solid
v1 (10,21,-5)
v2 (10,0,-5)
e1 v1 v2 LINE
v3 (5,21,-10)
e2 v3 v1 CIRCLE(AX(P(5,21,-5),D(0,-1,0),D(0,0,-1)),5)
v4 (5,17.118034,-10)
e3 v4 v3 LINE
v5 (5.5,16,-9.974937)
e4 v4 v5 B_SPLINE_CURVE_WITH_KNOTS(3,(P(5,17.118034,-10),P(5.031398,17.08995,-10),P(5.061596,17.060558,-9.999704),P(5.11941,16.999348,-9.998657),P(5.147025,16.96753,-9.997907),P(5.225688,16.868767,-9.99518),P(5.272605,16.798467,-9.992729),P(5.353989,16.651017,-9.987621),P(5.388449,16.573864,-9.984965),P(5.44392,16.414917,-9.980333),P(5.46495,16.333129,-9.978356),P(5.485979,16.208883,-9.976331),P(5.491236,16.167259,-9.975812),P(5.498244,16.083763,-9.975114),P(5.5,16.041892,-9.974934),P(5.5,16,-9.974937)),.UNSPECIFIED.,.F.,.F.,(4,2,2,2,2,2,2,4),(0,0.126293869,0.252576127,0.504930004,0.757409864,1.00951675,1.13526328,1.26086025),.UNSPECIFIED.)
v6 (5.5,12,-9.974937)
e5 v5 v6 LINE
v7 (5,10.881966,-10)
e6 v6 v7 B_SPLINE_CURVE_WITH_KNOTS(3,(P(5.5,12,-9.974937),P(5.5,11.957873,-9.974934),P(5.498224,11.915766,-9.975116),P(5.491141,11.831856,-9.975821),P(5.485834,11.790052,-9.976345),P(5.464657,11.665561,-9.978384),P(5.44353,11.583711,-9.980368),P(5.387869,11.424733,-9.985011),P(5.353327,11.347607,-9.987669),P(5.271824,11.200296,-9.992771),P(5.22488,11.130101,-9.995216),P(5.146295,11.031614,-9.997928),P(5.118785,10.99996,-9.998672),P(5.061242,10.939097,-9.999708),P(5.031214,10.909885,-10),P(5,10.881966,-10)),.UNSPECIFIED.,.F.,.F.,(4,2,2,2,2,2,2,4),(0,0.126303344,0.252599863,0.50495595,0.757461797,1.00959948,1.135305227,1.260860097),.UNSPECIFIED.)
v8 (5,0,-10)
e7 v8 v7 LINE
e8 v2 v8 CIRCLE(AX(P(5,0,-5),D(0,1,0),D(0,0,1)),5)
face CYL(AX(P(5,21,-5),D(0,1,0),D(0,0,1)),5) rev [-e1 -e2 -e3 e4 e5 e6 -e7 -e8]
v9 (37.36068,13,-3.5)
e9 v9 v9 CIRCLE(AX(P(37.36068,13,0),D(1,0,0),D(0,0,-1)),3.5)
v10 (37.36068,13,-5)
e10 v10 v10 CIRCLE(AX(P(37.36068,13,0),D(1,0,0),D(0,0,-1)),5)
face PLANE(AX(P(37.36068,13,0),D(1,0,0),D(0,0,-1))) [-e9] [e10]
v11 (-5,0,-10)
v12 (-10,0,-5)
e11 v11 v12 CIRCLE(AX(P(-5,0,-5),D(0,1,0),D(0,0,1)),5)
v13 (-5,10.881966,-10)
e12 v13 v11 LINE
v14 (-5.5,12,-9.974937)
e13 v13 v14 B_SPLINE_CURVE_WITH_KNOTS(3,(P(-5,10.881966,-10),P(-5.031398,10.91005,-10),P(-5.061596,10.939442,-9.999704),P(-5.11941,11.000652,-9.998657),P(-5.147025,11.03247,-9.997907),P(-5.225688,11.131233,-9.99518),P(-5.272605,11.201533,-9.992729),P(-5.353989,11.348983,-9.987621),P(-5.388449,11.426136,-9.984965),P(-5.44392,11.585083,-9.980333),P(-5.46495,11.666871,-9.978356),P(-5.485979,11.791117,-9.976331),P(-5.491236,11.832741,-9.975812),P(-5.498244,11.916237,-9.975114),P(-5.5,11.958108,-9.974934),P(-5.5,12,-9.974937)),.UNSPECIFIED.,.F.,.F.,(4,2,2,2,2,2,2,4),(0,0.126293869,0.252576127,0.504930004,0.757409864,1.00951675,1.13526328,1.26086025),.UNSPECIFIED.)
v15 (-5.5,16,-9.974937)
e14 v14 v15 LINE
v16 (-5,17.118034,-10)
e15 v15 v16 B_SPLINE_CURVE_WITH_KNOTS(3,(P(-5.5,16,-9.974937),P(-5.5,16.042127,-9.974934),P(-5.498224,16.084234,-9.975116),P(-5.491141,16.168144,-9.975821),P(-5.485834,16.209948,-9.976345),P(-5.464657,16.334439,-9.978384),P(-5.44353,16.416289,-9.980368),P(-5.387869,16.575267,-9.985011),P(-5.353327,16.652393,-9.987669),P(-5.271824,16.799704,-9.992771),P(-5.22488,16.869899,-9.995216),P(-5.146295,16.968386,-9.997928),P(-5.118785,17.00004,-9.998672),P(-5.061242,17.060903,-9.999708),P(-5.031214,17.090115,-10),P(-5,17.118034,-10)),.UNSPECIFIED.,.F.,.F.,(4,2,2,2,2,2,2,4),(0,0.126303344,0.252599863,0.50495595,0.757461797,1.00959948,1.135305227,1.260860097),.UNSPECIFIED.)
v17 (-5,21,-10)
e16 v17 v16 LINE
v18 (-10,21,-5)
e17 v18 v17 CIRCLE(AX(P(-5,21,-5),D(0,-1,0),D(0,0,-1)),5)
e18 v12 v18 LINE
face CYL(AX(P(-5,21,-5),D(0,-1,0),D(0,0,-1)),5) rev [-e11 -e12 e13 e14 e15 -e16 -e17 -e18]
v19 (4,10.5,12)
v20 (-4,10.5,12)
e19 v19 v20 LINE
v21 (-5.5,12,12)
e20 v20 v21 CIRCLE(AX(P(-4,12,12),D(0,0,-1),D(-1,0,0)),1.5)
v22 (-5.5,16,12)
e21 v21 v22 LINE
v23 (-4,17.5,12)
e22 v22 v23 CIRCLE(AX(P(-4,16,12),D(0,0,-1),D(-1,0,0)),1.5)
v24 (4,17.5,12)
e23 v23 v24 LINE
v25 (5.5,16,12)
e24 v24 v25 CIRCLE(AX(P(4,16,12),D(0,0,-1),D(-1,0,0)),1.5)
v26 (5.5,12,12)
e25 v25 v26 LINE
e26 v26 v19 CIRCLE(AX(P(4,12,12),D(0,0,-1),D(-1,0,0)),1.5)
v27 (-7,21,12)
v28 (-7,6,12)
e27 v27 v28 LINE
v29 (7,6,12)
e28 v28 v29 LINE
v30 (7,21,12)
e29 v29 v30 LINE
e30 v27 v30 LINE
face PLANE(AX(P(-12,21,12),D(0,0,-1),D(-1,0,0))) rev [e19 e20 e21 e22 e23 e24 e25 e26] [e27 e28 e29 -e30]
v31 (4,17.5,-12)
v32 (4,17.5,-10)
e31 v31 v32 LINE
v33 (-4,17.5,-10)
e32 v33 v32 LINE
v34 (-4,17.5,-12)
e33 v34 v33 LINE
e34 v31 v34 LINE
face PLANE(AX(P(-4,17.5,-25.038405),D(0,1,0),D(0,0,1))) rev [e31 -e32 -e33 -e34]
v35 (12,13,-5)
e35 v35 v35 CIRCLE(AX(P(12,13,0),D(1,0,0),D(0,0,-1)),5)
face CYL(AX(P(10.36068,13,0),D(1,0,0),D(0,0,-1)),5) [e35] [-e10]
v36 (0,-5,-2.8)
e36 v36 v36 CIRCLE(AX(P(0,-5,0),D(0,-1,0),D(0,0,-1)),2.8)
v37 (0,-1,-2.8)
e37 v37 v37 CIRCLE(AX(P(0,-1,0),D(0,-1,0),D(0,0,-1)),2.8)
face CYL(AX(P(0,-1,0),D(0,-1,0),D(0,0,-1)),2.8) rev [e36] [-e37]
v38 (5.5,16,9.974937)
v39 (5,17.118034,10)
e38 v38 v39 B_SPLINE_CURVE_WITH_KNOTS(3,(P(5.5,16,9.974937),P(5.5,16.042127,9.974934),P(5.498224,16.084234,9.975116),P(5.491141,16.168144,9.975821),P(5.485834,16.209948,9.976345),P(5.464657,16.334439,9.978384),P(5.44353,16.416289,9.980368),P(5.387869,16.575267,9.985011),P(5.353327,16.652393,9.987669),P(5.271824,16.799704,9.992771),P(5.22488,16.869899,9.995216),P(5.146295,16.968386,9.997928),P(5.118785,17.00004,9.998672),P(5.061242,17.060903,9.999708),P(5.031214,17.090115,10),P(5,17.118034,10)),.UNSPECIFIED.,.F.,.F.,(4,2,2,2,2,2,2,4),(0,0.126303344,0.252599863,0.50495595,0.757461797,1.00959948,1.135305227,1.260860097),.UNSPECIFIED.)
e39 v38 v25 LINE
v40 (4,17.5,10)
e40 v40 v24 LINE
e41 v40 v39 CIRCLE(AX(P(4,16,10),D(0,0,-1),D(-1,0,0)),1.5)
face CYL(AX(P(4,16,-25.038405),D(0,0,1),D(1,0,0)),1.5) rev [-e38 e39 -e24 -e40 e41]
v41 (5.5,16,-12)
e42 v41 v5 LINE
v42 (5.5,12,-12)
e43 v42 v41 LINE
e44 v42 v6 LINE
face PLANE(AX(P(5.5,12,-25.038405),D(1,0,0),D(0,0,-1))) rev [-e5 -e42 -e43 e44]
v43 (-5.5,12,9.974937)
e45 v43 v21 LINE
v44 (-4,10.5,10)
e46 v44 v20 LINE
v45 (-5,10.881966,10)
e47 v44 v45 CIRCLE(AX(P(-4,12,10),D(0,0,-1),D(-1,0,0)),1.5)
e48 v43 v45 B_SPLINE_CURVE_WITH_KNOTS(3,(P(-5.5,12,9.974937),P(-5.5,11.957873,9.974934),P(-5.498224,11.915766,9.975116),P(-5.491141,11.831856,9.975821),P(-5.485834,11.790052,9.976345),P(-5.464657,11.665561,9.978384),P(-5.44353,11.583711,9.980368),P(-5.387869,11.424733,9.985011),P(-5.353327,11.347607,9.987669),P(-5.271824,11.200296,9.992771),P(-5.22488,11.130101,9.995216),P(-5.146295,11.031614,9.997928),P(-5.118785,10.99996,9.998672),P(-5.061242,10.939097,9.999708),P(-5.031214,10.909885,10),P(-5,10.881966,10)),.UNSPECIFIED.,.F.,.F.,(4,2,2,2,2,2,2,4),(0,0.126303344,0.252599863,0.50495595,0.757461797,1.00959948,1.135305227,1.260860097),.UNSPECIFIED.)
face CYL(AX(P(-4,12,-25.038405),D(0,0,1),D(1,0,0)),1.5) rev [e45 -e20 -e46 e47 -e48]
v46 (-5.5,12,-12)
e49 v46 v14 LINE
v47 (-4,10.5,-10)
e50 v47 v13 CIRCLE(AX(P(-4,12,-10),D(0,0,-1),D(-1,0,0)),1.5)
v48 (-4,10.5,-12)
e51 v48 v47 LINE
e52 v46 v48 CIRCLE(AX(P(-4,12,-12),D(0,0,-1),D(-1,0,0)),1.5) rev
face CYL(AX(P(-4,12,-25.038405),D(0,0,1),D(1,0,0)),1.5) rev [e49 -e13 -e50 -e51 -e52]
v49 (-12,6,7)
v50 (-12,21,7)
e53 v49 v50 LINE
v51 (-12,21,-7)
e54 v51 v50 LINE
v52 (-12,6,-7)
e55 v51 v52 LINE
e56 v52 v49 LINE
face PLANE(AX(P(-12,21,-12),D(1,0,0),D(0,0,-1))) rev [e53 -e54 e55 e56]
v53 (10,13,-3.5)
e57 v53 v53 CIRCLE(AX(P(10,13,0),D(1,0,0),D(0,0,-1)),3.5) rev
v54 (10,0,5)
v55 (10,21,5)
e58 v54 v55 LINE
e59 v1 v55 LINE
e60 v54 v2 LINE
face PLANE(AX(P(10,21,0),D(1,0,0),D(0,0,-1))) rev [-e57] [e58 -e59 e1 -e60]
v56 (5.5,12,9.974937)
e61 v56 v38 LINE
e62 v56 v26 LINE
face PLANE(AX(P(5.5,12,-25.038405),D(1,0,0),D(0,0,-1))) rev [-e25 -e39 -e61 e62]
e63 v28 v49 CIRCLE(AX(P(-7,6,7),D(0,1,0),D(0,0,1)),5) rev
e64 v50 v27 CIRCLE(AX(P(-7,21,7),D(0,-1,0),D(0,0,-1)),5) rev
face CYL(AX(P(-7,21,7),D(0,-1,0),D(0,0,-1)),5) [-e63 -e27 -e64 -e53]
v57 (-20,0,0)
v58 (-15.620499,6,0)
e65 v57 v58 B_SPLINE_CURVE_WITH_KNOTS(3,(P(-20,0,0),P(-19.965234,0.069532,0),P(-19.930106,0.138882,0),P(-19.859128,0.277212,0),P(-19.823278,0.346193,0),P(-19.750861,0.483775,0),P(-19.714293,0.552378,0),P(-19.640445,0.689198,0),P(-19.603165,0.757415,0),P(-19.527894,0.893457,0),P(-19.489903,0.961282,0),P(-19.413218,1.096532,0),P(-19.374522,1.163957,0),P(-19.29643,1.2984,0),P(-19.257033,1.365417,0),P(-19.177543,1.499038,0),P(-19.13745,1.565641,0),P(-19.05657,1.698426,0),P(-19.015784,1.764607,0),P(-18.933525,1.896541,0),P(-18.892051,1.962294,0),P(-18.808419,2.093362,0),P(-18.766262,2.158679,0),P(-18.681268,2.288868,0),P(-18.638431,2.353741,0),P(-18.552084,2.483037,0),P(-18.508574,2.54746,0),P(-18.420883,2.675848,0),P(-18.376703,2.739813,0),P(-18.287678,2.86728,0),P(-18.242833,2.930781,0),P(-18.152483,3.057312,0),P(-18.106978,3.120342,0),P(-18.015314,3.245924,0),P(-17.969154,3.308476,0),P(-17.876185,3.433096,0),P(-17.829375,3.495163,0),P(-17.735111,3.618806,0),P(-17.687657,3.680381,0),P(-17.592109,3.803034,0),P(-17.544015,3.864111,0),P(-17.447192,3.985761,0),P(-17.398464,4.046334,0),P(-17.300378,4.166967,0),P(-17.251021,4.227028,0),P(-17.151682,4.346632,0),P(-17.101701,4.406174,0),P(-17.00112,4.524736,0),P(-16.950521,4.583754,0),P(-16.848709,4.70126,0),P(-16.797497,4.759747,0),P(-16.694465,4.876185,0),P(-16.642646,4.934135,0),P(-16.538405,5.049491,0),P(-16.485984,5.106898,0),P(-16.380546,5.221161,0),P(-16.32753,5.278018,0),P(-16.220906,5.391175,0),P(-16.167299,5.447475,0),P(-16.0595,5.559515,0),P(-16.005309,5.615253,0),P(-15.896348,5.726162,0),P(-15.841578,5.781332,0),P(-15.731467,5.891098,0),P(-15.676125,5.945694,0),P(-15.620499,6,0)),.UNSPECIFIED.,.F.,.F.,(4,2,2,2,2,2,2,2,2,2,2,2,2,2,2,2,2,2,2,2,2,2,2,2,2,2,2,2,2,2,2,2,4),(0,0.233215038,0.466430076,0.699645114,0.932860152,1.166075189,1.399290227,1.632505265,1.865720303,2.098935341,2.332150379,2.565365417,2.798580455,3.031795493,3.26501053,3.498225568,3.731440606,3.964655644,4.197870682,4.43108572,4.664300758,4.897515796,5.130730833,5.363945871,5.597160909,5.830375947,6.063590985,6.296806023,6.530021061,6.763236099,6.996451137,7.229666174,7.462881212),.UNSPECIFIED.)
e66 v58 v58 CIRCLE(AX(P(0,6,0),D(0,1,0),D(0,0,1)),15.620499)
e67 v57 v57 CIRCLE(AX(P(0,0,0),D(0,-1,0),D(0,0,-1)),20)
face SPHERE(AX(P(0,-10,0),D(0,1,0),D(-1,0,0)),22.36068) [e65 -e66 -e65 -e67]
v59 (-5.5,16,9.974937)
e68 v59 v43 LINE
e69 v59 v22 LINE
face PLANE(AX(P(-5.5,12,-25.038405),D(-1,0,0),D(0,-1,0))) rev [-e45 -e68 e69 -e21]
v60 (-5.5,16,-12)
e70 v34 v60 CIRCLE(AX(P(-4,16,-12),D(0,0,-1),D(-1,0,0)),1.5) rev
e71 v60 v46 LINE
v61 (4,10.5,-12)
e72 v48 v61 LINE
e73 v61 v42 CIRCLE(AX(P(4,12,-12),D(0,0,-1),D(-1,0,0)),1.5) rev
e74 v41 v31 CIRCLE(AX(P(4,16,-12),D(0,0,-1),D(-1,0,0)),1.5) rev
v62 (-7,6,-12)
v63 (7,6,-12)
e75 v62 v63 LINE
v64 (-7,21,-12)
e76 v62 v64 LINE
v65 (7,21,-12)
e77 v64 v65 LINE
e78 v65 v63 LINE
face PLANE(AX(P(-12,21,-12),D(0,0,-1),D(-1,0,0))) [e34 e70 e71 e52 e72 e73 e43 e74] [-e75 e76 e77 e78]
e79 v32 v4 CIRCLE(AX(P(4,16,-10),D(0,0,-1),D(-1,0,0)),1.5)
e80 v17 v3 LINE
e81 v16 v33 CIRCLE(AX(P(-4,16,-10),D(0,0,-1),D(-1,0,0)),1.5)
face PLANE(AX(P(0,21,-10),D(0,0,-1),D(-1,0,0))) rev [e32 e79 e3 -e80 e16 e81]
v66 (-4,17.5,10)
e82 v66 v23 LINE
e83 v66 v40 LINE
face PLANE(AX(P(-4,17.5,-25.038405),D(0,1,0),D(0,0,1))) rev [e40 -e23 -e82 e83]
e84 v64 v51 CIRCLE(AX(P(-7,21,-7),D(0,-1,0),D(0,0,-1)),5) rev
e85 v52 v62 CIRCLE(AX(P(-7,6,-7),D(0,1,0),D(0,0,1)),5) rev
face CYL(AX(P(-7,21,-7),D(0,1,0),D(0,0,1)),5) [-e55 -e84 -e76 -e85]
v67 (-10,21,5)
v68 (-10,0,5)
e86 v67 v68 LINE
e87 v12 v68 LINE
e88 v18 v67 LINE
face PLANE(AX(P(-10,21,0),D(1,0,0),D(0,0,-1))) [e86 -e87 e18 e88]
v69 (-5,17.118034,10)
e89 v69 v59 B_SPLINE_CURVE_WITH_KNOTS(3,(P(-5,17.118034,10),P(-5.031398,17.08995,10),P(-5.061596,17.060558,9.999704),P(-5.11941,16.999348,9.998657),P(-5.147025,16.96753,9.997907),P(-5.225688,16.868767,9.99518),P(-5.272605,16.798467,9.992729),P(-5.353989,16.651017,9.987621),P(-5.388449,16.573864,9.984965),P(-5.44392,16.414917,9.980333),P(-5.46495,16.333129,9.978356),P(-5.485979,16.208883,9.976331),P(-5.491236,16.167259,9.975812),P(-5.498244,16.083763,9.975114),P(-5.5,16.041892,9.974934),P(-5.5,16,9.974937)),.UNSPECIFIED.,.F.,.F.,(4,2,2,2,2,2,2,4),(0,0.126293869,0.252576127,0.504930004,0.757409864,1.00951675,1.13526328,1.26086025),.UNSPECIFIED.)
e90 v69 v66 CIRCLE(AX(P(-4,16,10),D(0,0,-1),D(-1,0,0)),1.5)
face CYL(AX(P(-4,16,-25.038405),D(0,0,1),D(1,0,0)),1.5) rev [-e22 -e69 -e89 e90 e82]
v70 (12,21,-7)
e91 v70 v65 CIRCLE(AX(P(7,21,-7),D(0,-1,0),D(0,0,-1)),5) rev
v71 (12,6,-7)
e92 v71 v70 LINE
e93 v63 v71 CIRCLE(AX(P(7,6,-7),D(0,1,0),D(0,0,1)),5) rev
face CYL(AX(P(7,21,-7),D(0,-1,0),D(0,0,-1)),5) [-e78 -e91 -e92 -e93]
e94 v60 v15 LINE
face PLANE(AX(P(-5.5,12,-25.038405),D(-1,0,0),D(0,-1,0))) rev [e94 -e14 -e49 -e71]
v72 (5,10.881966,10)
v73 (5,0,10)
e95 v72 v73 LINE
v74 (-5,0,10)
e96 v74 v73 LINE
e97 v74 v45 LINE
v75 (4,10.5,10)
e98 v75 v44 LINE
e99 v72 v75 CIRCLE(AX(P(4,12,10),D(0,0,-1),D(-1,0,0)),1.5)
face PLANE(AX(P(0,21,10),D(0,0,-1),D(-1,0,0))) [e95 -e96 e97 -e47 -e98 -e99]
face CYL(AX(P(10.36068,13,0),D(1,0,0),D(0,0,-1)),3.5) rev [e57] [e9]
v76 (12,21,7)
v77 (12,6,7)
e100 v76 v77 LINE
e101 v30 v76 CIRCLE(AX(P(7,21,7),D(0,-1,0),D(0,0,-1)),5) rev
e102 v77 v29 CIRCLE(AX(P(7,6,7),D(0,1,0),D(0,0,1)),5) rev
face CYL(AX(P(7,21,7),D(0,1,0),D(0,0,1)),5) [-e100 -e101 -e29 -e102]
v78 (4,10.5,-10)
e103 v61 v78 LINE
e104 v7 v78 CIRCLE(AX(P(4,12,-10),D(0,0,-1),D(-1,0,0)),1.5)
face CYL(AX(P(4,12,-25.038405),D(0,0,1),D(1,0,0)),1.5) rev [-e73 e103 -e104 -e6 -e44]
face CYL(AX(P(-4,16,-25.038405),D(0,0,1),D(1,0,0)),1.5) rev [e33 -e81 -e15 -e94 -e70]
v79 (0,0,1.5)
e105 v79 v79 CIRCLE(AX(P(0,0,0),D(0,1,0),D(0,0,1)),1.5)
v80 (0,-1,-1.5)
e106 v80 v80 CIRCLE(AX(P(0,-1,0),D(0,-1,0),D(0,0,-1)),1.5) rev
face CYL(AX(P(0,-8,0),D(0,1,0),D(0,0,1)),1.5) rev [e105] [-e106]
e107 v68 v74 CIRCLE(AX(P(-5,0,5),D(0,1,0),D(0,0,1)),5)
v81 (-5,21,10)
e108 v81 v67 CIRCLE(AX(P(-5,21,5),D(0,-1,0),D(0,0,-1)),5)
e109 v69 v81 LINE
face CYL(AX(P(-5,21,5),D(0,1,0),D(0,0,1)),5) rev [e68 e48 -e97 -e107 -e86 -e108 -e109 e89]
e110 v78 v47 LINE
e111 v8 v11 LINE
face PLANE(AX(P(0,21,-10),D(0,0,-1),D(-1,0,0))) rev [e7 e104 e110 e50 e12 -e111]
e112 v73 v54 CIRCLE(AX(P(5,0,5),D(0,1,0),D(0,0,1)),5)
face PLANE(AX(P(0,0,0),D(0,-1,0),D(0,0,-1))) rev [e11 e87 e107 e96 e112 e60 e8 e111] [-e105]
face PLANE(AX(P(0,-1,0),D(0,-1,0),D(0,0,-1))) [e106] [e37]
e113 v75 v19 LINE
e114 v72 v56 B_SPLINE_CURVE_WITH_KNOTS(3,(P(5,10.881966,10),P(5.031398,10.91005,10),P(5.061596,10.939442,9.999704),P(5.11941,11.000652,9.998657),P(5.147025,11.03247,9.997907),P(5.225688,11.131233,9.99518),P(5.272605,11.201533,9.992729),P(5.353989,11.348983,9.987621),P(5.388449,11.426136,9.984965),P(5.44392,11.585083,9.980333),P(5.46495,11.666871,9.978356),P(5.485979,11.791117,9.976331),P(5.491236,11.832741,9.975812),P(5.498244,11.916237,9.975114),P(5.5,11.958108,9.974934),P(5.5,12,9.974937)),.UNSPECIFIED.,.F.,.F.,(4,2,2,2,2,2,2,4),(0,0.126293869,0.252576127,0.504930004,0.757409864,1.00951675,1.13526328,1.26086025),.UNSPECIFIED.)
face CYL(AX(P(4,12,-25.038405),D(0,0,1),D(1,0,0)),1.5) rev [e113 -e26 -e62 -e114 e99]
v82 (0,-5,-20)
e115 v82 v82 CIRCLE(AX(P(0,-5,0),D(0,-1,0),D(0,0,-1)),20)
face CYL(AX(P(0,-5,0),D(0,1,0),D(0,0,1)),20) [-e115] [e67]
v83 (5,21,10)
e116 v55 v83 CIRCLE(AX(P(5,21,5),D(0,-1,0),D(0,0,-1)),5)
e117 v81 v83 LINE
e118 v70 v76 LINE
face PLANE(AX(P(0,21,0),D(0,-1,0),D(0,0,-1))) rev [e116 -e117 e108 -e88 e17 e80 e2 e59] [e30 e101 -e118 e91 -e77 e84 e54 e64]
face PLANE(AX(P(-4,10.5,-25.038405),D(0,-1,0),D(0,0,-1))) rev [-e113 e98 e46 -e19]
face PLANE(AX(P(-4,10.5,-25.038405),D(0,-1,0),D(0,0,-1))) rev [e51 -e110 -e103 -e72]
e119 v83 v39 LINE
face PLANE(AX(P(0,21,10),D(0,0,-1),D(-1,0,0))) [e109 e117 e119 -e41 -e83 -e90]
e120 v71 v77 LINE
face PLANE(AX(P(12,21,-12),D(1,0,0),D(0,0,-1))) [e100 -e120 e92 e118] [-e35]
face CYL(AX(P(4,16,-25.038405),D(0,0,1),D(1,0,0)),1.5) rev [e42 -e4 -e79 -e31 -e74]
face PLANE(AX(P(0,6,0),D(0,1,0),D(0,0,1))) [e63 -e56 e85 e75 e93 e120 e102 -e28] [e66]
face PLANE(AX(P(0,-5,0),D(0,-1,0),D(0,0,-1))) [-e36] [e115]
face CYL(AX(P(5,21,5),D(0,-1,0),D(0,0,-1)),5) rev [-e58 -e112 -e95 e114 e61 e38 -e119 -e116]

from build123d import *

# Parameters (mm, degrees)
SKETCH_3_R                      = 2.8
CUT_EXTRUDE_2_DEPTH             = 4
SKETCH_8_R                      = 1.5
CUT_EXTRUDE_5_DEPTH             = 4
SKETCH_10_W                     = 24
SKETCH_10_H                     = 24
SKETCH_10_W_2                   = 20
SKETCH_10_H_2                   = 20
EXTRUDE_1_DEPTH                 = 15
EXTRUDE_2_DEPTH                 = 15
EXTRUDE_2_DEPTH_BACK            = 12
SKETCH_7_R                      = 5
SKETCH_7_R_2                    = 3.5
SKETCH_7_5_R                    = 3.5
CUT_EXTRUDE_6_DEPTH             = 12.360679775
FILLET_START                    = 6
FILLET_1_DEPTH                  = 15
FILLET_1_2_DEPTH                = 15
CUT_EXTRUDE_7_REACH             = 55.487
CUT_EXTRUDE_7_DIRECTION_2_DEPTH = 54.486637521
SKETCH_15_R                     = 20
EXTRUDE_3_DEPTH                 = 5
CUT_EXTRUDE_START               = -6
CUT_EXTRUDE_9_DEPTH             = 6
SKETCH_17_R                     = 1.5
CUT_EXTRUDE_10_DEPTH            = 8
SKETCH_18_R                     = 2.8
CUT_EXTRUDE_11_DEPTH            = 4


with BuildPart() as part:
    # 草图1 → 旋转1 (revolve)
    with BuildSketch(Plane.XY):
        with BuildLine():
            ThreePointArc((-15.620499352, 6), (-18.061145964, 3.183133409), (-20, 0))
            Line((-20, 0), (0, 0))
            Line((0, 0), (0, 6))
            Line((0, 6), (-15.620499352, 6))
        make_face()
    revolve(axis=Axis((0, 10, 0), (0, -1, 0)))

    # 草图3 → 切除-拉伸2 (cut)
    with BuildSketch(Plane.XZ):
        with Locations(Location((0, 0, 0), (0, 0, 270))):
            Circle(SKETCH_3_R)
    extrude(amount=-CUT_EXTRUDE_2_DEPTH, mode=Mode.SUBTRACT)

    # 草图8 → 切除-拉伸5 (cut)
    with BuildSketch(Plane.XZ.offset(-4)):
        with Locations(Location((0, 0, 0), (0, 0, 270))):
            Circle(SKETCH_8_R)
    extrude(amount=-CUT_EXTRUDE_5_DEPTH, mode=Mode.SUBTRACT)

    # 草图10 → 拉伸-薄壁1 (add)
    with BuildSketch(Plane(origin=(0, 6, 0), x_dir=(1, 0, 0), z_dir=(0, 1, 0))):
        Rectangle(SKETCH_10_W, SKETCH_10_H)
        Rectangle(SKETCH_10_W_2, SKETCH_10_H_2, mode=Mode.SUBTRACT)
    extrude(amount=EXTRUDE_1_DEPTH)

    # 草图7 → 凸台-拉伸2 (add, two sides: drawn at the far end of the back side and taken through both)
    with BuildSketch(Plane(origin=(22.360679775, 0, 0), x_dir=(0, 0, -1), z_dir=(1, 0, 0)).offset(-EXTRUDE_2_DEPTH_BACK)):
        with Locations((0, 13)):
            Circle(SKETCH_7_R)
        with Locations((0, 13)):
            Circle(SKETCH_7_R_2, mode=Mode.SUBTRACT)
    extrude(amount=EXTRUDE_2_DEPTH + EXTRUDE_2_DEPTH_BACK)

    # 草图7<5> → 切除-拉伸6 (cut)
    with BuildSketch(Plane(origin=(22.360679775, 0, 0), x_dir=(0, 0, -1), z_dir=(1, 0, 0))):
        with Locations((0, 13)):
            Circle(SKETCH_7_5_R)
    extrude(amount=-CUT_EXTRUDE_6_DEPTH, mode=Mode.SUBTRACT)

    # 圆角1: read off the stored shape, not the designer's step
    # 圆角1 outline → 圆角1 (cut)
    with BuildSketch(Plane(origin=(0, 0, 0), x_dir=(1, 0, 0), z_dir=(0, 1, 0)).offset(FILLET_START)):
        with BuildLine():
            ThreePointArc((-12, 7), (-10.535533906, 10.535533906), (-7, 12))
            Line((-7, 12), (-12, 12))
            Line((-12, 12), (-12, 7))
        make_face()
        with BuildLine():
            Line((12, 12), (7, 12))
            ThreePointArc((7, 12), (10.535533906, 10.535533906), (12, 7))
            Line((12, 7), (12, 12))
        make_face()
        with BuildLine():
            ThreePointArc((-7, -12), (-10.535533906, -10.535533906), (-12, -7))
            Line((-12, -7), (-12, -12))
            Line((-12, -12), (-7, -12))
        make_face()
        with BuildLine():
            Line((12, -12), (12, -7))
            ThreePointArc((12, -7), (10.535533906, -10.535533906), (7, -12))
            Line((7, -12), (12, -12))
        make_face()
    extrude(amount=FILLET_1_DEPTH, mode=Mode.SUBTRACT)

    # Fillet 1 2 outline → Fillet 1 2 (add)
    with BuildSketch(Plane(origin=(0, 0, 0), x_dir=(1, 0, 0), z_dir=(0, 1, 0)).offset(FILLET_START)):
        with BuildLine():
            Line((10, -10), (10, -5))
            ThreePointArc((10, -5), (8.535533906, -8.535533906), (5, -10))
            Line((5, -10), (10, -10))
        make_face()
        with BuildLine():
            ThreePointArc((5, 10), (8.535533906, 8.535533906), (10, 5))
            Line((10, 5), (10, 10))
            Line((10, 10), (5, 10))
        make_face()
        with BuildLine():
            Line((-10, -10), (-5, -10))
            ThreePointArc((-5, -10), (-8.535533906, -8.535533906), (-10, -5))
            Line((-10, -5), (-10, -10))
        make_face()
        with BuildLine():
            ThreePointArc((-10, 5), (-8.535533906, 8.535533906), (-5, 10))
            Line((-5, 10), (-10, 10))
            Line((-10, 10), (-10, 5))
        make_face()
    extrude(amount=FILLET_1_2_DEPTH)

    # 切除-拉伸7: up to this face of the body (flat: up to its plane)
    cut_extrude_7_end = Plane(part.part.faces().sort_by_distance((0, 13.5, -12))[0])
    # 草图13 → 切除-拉伸7 (cut, up to the picked face)
    with BuildSketch(Plane.XY.offset(12), mode=Mode.PRIVATE) as cut_extrude_7_sk1:
        with BuildLine():
            Line((-4, 17.5), (4, 17.5))
            ThreePointArc((4, 17.5), (5.060660172, 17.060660172), (5.5, 16))
            Line((5.5, 16), (5.5, 12))
            ThreePointArc((5.5, 12), (5.060660172, 10.939339828), (4, 10.5))
            Line((4, 10.5), (-4, 10.5))
            ThreePointArc((-4, 10.5), (-5.060660172, 10.939339828), (-5.5, 12))
            Line((-5.5, 12), (-5.5, 16))
            ThreePointArc((-5.5, 16), (-5.060660172, 17.060660172), (-4, 17.5))
        make_face()
    cut_extrude_7_tool1 = split(extrude(cut_extrude_7_sk1.sketch, amount=-CUT_EXTRUDE_7_REACH, mode=Mode.PRIVATE), bisect_by=cut_extrude_7_end, keep=Keep.BOTH, mode=Mode.PRIVATE)
    add(cut_extrude_7_tool1.solids().sort_by(Axis((0, 14, 12), (0, 0, -1)))[0], mode=Mode.SUBTRACT)

    # 草图13 → 切除-拉伸7 direction 2 (cut)
    with BuildSketch(Plane.XY.offset(12)):
        with BuildLine():
            Line((-4, 17.5), (4, 17.5))
            ThreePointArc((4, 17.5), (5.060660172, 17.060660172), (5.5, 16))
            Line((5.5, 16), (5.5, 12))
            ThreePointArc((5.5, 12), (5.060660172, 10.939339828), (4, 10.5))
            Line((4, 10.5), (-4, 10.5))
            ThreePointArc((-4, 10.5), (-5.060660172, 10.939339828), (-5.5, 12))
            Line((-5.5, 12), (-5.5, 16))
            ThreePointArc((-5.5, 16), (-5.060660172, 17.060660172), (-4, 17.5))
        make_face()
    extrude(amount=CUT_EXTRUDE_7_DIRECTION_2_DEPTH, mode=Mode.SUBTRACT)

    # 草图15 → 凸台-拉伸3 (add)
    with BuildSketch(Plane.XZ):
        with Locations(Location((0, 0, 0), (0, 0, 180))):
            Circle(SKETCH_15_R)
    extrude(amount=EXTRUDE_3_DEPTH)

    # 草图16 → 切除-拉伸9 (cut)
    with BuildSketch(Plane(origin=(0, 6, 0), x_dir=(1, 0, 0), z_dir=(0, 1, 0)).offset(CUT_EXTRUDE_START)):
        with BuildLine():
            Line((-5, -10), (5, -10))
            ThreePointArc((5, -10), (8.535533906, -8.535533906), (10, -5))
            Line((10, -5), (10, 5))
            ThreePointArc((10, 5), (8.535533906, 8.535533906), (5, 10))
            Line((5, 10), (-5, 10))
            ThreePointArc((-5, 10), (-8.535533906, 8.535533906), (-10, 5))
            Line((-10, 5), (-10, -5))
            ThreePointArc((-10, -5), (-8.535533906, -8.535533906), (-5, -10))
        make_face()
    extrude(amount=CUT_EXTRUDE_9_DEPTH, mode=Mode.SUBTRACT)

    # 草图17 → 切除-拉伸10 (cut)
    with BuildSketch(Plane(origin=(0, 0, 0), x_dir=(1, 0, 0), z_dir=(0, 1, 0))):
        with Locations(Location((0, 0, 0), (0, 0, 270))):
            Circle(SKETCH_17_R)
    extrude(amount=-CUT_EXTRUDE_10_DEPTH, mode=Mode.SUBTRACT)

    # 草图18 → 切除-拉伸11 (cut)
    with BuildSketch(Plane.XZ.offset(5)):
        with Locations(Location((0, 0, 0), (0, 0, 270))):
            Circle(SKETCH_18_R)
    extrude(amount=-CUT_EXTRUDE_11_DEPTH, mode=Mode.SUBTRACT)


solid = part.part
